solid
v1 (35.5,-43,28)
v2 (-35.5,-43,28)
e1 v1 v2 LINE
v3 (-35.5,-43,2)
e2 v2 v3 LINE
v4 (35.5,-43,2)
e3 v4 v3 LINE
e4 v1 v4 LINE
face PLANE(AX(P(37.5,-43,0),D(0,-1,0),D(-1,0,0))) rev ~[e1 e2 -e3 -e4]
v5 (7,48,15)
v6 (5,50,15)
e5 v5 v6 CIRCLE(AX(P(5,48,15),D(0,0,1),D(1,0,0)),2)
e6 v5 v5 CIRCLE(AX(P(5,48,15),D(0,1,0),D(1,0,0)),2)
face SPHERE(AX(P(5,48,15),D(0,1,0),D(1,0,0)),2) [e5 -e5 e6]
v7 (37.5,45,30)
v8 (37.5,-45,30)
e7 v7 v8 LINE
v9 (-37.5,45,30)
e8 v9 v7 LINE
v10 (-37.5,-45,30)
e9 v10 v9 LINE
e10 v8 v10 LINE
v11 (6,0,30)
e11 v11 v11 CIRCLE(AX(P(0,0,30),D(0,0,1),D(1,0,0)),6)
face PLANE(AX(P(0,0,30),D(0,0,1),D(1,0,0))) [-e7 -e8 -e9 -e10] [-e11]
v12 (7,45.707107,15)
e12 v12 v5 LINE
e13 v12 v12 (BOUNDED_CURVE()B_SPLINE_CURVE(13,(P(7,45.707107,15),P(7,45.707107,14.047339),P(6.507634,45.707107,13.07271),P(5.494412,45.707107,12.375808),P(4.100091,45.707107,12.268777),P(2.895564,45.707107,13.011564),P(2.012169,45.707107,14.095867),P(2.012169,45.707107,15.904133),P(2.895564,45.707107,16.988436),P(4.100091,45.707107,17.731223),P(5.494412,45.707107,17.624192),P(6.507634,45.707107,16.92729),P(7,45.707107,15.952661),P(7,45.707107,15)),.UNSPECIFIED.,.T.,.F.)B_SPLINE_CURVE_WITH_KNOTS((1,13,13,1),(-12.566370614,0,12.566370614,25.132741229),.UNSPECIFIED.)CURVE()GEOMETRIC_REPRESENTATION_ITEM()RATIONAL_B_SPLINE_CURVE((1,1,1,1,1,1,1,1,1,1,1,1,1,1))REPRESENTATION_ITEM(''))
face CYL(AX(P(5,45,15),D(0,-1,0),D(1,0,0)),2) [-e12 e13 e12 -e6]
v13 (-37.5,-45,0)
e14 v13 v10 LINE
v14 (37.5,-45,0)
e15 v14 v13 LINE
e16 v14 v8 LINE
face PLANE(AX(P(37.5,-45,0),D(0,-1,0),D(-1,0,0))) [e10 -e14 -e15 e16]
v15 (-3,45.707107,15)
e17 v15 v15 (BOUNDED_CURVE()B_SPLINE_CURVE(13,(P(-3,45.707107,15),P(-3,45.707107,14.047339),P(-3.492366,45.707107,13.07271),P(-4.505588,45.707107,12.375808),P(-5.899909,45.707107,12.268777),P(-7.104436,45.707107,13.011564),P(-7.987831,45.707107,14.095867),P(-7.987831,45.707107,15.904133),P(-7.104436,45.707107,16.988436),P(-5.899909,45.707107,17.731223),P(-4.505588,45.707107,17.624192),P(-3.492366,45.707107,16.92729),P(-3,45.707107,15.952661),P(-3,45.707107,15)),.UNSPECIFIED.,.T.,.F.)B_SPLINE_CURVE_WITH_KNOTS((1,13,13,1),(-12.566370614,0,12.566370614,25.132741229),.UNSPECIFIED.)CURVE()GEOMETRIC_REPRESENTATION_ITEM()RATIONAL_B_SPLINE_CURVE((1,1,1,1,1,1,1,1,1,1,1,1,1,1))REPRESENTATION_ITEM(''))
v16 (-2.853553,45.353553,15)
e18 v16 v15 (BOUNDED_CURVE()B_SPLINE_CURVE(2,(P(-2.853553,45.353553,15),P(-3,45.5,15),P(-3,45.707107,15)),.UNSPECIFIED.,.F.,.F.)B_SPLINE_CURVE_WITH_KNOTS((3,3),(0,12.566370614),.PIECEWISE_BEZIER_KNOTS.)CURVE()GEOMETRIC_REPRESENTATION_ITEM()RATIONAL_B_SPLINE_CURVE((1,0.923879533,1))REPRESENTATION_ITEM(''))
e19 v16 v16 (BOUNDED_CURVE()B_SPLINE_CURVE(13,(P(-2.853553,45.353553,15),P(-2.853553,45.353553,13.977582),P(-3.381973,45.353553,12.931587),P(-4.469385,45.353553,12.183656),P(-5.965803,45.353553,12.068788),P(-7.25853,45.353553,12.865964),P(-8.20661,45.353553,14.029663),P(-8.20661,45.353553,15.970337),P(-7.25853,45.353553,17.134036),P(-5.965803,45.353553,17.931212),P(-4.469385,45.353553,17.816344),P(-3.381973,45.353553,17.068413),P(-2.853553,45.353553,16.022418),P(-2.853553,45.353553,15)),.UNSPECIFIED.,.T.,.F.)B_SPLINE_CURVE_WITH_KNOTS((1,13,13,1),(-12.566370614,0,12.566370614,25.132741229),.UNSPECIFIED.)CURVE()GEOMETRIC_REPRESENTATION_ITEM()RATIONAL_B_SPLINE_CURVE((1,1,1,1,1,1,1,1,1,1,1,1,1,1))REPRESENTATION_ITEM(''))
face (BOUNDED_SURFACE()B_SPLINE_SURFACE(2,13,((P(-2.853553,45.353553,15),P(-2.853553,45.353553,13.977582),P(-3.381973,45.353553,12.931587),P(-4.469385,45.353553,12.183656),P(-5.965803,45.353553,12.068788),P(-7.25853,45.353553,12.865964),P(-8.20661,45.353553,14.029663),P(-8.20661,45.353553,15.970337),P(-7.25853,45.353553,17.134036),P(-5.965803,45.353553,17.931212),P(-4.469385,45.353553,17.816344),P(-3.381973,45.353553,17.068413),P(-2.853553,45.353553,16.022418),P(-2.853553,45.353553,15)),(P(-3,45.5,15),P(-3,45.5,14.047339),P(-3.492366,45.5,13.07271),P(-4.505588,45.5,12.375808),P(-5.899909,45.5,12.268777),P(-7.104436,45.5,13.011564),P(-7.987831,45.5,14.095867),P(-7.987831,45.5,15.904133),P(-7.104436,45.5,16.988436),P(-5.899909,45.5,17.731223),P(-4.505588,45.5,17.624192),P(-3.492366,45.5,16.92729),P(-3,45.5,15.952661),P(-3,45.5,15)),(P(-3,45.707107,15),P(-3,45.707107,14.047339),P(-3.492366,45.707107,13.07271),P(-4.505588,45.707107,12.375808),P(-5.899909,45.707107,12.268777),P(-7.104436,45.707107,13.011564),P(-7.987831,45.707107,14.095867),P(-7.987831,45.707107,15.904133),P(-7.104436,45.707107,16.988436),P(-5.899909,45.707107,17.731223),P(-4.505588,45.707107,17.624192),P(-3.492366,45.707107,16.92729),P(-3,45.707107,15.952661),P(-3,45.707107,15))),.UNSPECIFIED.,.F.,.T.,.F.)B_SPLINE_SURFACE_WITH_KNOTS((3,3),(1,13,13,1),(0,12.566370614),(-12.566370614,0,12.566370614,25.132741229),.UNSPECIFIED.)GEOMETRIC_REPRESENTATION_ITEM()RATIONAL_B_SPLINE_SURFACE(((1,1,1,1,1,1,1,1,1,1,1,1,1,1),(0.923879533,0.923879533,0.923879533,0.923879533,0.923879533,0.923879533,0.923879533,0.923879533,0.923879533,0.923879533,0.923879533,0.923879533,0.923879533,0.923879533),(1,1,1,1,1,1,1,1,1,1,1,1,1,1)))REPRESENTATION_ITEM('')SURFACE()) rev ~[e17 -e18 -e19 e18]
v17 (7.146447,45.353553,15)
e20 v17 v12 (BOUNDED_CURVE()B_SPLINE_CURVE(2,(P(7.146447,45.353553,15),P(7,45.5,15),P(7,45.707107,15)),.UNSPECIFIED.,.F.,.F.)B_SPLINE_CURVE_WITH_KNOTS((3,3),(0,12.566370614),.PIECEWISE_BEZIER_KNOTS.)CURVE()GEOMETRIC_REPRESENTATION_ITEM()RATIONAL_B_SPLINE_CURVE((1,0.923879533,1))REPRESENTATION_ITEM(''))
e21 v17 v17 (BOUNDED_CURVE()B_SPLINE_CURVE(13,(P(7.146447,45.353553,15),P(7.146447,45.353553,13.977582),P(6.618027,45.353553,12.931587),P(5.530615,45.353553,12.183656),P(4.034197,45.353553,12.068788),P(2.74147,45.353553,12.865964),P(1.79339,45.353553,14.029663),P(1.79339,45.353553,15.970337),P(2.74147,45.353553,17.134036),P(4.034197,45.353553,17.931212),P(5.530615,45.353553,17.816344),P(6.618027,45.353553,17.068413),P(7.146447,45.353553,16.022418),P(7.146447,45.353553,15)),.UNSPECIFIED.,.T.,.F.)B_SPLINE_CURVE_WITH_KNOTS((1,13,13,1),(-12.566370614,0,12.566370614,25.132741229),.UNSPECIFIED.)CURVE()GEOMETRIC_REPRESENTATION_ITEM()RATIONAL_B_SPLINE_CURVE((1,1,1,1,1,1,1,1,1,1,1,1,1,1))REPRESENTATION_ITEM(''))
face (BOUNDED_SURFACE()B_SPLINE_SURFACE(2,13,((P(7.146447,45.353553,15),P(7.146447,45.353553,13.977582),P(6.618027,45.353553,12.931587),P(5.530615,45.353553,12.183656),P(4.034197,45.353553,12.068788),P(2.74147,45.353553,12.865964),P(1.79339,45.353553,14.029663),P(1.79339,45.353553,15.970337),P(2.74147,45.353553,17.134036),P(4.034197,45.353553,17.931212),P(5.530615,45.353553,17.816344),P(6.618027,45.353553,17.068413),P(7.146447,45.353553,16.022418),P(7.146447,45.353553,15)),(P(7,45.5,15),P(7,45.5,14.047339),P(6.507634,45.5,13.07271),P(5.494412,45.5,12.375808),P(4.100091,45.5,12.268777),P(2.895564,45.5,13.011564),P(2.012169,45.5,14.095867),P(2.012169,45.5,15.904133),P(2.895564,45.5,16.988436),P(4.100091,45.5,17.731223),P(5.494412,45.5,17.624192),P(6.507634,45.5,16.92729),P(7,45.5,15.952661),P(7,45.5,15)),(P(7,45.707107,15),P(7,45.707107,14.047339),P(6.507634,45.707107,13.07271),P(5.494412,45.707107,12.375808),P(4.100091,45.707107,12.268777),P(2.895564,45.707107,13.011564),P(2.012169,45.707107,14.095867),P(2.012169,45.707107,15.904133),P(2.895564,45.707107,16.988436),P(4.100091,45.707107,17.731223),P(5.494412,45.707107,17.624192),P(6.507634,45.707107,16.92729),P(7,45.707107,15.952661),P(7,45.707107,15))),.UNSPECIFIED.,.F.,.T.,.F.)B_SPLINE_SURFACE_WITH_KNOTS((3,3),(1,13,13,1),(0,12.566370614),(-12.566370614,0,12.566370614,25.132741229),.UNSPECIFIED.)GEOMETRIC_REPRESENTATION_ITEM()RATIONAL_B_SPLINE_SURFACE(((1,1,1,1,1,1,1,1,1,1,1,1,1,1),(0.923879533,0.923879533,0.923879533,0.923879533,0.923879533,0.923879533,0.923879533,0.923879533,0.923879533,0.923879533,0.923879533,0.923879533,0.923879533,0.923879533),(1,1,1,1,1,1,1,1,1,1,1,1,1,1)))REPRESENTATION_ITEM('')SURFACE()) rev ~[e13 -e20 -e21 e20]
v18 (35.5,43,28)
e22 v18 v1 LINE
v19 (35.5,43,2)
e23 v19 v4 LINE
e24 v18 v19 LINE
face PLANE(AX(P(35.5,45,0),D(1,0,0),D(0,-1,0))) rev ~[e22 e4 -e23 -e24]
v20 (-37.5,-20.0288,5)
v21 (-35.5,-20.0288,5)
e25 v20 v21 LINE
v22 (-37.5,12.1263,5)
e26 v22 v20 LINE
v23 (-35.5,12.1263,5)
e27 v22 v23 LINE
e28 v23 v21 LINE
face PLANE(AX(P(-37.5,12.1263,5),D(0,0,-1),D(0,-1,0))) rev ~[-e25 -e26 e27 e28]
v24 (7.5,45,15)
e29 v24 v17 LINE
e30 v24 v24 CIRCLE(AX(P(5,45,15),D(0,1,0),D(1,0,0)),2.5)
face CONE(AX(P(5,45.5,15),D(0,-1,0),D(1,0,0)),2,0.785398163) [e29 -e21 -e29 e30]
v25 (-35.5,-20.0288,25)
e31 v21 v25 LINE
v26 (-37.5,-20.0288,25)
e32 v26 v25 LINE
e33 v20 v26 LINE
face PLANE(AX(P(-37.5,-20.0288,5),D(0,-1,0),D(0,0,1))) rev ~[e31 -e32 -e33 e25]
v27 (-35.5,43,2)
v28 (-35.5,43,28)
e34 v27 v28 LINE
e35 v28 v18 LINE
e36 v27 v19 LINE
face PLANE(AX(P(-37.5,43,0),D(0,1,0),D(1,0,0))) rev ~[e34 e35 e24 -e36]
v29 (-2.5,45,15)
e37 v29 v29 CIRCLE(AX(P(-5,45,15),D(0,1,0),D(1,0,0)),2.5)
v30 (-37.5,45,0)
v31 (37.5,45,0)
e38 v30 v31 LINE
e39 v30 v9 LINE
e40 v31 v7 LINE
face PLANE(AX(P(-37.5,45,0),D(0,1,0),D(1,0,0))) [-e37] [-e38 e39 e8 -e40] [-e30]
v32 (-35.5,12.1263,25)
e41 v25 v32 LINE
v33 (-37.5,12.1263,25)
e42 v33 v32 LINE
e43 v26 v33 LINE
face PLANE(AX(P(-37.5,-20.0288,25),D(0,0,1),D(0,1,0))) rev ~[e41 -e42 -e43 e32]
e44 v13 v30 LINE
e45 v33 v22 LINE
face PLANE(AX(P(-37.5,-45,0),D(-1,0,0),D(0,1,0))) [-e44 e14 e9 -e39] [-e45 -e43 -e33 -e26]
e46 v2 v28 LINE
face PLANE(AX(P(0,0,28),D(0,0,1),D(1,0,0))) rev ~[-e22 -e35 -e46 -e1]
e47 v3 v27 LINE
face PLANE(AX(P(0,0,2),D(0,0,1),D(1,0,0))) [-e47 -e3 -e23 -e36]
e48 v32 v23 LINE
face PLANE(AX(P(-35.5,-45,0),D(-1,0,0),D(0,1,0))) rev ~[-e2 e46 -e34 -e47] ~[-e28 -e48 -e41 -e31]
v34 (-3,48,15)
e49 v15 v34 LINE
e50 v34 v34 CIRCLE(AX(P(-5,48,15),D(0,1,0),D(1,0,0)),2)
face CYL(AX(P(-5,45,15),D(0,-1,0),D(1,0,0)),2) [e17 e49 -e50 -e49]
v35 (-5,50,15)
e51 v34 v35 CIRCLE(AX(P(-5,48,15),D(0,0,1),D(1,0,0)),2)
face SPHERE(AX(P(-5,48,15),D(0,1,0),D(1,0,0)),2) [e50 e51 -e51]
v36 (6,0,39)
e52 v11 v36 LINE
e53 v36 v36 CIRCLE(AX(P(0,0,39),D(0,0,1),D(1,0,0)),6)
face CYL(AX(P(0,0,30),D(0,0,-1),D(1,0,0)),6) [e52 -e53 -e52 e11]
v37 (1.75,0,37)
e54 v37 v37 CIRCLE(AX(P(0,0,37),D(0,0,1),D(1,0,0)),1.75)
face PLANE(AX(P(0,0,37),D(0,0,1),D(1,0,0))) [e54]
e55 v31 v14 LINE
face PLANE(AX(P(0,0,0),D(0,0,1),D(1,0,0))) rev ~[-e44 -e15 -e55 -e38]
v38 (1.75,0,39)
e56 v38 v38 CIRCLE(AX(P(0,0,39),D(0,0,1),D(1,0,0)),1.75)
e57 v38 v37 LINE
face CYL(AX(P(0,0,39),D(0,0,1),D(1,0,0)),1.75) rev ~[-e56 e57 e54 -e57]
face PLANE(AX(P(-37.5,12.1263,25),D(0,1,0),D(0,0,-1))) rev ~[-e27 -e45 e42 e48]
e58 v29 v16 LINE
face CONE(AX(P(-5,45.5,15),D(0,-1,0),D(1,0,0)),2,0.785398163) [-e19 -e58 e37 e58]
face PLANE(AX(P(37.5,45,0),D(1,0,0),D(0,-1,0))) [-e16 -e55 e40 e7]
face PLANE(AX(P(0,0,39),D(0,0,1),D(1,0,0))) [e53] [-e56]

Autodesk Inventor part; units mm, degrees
ref_plane "YZ Plane" through (0, 0, 0) normal (1, 0, 0) x (0, 1, 0)
ref_plane "XZ Plane" through (0, 0, 0) normal (0, 1, 0) x (-1, 0, 0)
ref_plane "XY Plane" through (0, 0, 0) normal (0, 0, 1) x (1, 0, 0)
sketch "Sketch1" plane through (0, 0, 0) normal (0, 0, 1) x (1, 0, 0)
  line L0 (-37.5, 45) -> (37.5, 45)
  line L1 (37.5, 45) -> (37.5, -45)
  line L2 (37.5, -45) -> (-37.5, -45)
  line L3 (-37.5, -45) -> (-37.5, 45)
  point P0 (0, 0)
  point P1 (0, -45)
  point P2 (0, 45)
  point P3 (-37.5, 0)
  dimension "d0" = 90
  dimension "d1" = 75
  dimension "d2" = 37.5
  dimension "d3" = 45
extrude "Extrusion1" add sketch "Sketch1" along normal blind 30
shell "Shell1" thickness 2 removed faces 0
sketch "Sketch2" plane through (-37.5, 45, 0) normal (0, 1, 0) x (1, 0, 0)
  circle A0 centre (42.5, -15) radius 2
  line L0 (75, 0) -> (0, 0) projected
  circle A1 centre (32.5, -15) radius 2
  line L1 (75, 0) -> (75, -30) projected
  point P0 (37.5, 0)
  point P1 (37.5, 0)
  dimension "d7" = 15
  dimension "d8" = 10
  dimension "d9" = 15
  dimension "d10" = 4
  dimension "d11" = 4
  dimension "d12" = 32.5
extrude "Extrusion2" add sketch "Sketch2" along normal blind 5
fillet "Fillet1" radius 2 1 edges at (3, 50, 15)
fillet "Fillet2" radius 2 1 edges at (-7, 50, 15)
chamfer "Chamfer1" distance 0.5 angle 45 1 edges at (3, 45, 15)
chamfer "Chamfer2" distance 0.5 angle 45 1 edges at (-7, 45, 15)
fillet "Fillet3" radius 0.5 1 edges at (3, 45.5, 15)
fillet "Fillet4" radius 0.5 1 edges at (-7, 45.5, 15)
sketch "Sketch3" plane through (0, 0, 30) normal (0, 0, 1) x (1, 0, 0)
  circle A0 centre (0, 0) radius 6
  dimension "d25" = 12
extrude "Extrusion3" add sketch "Sketch3" along normal blind 9
sketch "Sketch4" plane through (0, 0, 39) normal (0, 0, 1) x (1, 0, 0)
  circle A0 centre (0, 0) radius 1.75
  dimension "d28" = 3.5
extrude "Extrusion4" cut sketch "Sketch4" against normal blind 2
sketch "Sketch5" plane through (-37.5, 45, 0) normal (0, 1, 0) x (1, 0, 0)
  point P0 (37.5, 0)
sketch "Sketch6" plane through (-37.5, -45, 0) normal (-1, 0, 0) x (0, 0, 1)
  line L0 (25, 57.1263) -> (5, 57.1263)
  line L1 (5, 57.1263) -> (5, 24.9712)
  line L2 (5, 24.9712) -> (25, 24.9712)
  line L3 (25, 24.9712) -> (25, 57.1263)
  line L4 (30, 90) -> (30, 0) projected
  line L5 (0, 90) -> (0, 0) projected
  point P0 (0, 45)
  point P1 (25, 41.0487)
  dimension "d31" = 5
  dimension "d32" = 5
extrude "Extrusion5" cut sketch "Sketch6" against normal blind 2
sketch "Sketch7" plane through (-37.5, -45, 0) normal (-1, 0, 0) x (0, 0, 1)
  point P0 (0, 45)
equation "\"BendRadius\" = Thickness"
equation "\"BendReliefWidth\" = Thickness"
equation "\"BendReliefDepth\" = 0.5 * Thickness"
equation "\"CornerReliefSize\" = 4 * Thickness"
equation "\"MinimumRemnant\" = 2 * Thickness"
equation "\"TransitionRadius\" = BendRadius"
equation "\"JacobiRadiusSize\" = BendRadius"
equation "\"GapSize\" = Thickness"
equation "\"Thickness\" = 0.5"
properties part number "Utuh"
